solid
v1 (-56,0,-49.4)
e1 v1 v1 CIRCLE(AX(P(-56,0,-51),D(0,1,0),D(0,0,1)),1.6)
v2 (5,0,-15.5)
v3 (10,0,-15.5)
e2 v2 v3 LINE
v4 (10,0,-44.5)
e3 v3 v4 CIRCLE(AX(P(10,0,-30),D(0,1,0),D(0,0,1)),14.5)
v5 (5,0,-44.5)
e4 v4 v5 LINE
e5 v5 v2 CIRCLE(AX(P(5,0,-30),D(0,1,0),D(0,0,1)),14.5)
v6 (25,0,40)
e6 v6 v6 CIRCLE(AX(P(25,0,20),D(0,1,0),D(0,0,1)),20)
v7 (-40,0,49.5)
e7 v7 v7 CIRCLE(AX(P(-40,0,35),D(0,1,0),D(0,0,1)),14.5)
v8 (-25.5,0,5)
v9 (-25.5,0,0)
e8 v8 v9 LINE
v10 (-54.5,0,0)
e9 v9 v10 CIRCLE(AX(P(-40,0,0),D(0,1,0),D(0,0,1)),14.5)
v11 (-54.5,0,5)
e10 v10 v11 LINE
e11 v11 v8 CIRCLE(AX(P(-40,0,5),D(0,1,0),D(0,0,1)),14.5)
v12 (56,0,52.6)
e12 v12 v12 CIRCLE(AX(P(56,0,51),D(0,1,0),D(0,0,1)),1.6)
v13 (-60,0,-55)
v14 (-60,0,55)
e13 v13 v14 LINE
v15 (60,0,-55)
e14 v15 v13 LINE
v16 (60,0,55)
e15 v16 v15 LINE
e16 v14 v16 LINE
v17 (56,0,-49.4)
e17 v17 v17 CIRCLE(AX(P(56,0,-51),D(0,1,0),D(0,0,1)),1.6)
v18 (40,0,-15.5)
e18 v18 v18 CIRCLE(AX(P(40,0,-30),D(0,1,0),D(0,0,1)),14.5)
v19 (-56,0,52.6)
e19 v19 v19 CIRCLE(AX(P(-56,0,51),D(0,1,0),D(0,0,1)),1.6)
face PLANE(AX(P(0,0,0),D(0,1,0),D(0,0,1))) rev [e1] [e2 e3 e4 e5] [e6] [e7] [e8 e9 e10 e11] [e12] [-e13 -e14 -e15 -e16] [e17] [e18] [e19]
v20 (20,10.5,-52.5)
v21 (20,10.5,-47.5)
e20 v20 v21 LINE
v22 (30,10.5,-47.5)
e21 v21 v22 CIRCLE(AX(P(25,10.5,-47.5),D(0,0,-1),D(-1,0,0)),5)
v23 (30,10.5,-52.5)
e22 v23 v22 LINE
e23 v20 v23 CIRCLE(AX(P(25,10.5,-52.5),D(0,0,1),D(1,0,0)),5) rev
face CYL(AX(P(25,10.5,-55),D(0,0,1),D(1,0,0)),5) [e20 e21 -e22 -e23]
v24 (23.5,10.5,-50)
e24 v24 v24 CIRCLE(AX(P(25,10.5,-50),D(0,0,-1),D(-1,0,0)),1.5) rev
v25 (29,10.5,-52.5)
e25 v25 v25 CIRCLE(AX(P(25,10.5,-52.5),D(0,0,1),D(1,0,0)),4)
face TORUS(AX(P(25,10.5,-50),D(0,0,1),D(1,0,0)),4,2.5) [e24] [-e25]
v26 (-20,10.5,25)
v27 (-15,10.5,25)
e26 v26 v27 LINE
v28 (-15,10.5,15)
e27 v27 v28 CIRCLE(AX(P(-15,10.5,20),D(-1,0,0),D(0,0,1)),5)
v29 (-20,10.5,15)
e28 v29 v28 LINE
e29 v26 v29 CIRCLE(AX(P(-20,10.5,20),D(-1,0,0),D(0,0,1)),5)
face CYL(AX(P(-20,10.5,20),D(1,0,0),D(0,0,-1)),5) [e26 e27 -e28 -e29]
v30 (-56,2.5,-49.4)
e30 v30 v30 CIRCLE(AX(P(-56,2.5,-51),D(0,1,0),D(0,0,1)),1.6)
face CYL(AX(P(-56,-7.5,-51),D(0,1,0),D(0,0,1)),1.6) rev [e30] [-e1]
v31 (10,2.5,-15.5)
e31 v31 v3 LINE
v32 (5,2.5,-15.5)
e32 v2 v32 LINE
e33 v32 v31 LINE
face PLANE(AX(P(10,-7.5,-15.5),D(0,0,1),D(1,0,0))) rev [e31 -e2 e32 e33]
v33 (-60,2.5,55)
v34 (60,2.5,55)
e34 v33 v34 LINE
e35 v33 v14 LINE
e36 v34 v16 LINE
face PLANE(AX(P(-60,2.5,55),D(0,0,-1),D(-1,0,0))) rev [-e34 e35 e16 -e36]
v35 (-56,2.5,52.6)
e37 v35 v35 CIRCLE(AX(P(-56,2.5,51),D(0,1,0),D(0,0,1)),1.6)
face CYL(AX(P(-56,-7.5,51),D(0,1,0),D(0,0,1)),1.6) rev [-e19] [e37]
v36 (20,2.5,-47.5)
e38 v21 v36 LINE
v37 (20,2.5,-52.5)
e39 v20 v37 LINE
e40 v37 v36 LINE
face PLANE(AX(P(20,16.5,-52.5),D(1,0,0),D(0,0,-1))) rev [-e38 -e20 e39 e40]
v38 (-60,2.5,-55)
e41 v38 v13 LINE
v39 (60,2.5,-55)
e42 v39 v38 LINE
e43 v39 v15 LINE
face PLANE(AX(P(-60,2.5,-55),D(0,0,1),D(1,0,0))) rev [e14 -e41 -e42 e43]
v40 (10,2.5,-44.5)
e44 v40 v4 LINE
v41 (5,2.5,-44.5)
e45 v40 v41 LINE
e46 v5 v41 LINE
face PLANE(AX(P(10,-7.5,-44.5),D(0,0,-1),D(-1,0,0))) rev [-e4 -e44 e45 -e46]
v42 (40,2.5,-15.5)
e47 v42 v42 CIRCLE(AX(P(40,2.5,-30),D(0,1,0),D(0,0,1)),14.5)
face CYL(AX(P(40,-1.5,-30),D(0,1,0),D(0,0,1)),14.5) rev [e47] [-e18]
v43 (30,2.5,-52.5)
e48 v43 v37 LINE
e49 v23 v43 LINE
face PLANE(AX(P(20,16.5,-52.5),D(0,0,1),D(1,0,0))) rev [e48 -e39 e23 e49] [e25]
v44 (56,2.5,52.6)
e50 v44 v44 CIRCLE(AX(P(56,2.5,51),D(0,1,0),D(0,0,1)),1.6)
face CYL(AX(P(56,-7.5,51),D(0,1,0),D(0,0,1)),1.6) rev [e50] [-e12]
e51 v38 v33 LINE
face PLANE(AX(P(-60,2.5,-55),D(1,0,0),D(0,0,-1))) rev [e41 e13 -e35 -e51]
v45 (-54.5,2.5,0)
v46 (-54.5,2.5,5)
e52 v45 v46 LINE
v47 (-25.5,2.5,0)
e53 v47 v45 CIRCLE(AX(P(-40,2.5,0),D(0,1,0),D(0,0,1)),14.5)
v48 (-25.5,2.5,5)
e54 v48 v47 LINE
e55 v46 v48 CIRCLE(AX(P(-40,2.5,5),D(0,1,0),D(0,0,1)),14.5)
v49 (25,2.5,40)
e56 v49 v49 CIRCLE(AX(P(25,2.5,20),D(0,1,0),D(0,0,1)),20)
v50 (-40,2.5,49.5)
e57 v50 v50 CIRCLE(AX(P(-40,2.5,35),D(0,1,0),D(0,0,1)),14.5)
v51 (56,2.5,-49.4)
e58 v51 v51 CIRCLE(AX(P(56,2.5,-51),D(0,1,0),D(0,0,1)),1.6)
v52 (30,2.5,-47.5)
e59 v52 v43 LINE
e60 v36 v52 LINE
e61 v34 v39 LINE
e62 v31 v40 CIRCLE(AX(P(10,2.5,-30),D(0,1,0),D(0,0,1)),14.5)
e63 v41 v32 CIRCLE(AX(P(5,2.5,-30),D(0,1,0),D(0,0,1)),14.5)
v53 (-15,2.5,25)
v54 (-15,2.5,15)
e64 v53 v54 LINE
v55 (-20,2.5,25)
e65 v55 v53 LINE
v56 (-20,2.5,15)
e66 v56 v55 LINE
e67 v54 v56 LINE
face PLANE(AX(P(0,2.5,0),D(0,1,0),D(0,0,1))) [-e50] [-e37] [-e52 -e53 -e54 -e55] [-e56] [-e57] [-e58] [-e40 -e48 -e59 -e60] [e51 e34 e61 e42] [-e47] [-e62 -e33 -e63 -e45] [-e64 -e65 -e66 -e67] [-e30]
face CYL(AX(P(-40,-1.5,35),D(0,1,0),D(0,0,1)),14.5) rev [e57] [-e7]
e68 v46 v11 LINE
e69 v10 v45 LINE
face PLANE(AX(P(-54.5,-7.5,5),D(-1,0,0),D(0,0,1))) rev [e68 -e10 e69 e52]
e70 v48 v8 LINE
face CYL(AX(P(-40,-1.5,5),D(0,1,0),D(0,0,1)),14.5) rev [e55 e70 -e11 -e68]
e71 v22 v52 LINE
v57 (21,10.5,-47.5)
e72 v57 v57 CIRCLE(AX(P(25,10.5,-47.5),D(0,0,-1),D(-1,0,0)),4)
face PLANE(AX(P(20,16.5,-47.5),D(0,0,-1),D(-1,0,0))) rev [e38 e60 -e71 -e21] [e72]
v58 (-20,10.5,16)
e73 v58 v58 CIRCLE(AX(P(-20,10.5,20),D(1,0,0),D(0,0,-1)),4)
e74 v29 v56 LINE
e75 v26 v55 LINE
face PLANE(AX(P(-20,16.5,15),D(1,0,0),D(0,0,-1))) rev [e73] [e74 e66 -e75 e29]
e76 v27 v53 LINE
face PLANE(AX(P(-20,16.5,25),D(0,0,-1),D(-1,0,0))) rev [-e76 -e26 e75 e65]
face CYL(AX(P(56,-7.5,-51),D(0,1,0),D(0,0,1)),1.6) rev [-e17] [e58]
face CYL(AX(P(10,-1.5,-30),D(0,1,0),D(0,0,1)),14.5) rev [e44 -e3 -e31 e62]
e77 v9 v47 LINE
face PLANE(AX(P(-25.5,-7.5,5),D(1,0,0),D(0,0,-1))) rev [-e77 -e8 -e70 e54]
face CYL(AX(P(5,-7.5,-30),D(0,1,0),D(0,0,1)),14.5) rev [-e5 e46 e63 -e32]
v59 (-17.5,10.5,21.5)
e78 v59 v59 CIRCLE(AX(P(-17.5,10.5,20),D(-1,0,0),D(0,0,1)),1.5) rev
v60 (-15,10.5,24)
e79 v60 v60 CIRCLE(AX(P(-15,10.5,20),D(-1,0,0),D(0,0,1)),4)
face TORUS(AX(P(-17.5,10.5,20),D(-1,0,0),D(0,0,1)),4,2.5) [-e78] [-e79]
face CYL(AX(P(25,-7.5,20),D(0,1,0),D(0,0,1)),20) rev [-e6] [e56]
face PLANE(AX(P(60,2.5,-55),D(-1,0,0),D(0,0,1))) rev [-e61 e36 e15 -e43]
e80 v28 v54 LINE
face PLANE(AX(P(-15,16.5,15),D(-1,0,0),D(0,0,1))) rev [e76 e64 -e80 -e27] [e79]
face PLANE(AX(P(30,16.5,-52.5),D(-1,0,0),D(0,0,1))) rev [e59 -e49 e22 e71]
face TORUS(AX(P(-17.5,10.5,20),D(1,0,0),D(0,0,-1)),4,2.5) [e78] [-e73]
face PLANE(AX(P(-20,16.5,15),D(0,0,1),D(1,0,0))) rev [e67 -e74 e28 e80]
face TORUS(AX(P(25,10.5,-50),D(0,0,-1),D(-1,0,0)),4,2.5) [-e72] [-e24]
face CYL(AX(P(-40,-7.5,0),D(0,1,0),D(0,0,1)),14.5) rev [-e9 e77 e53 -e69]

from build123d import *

# Parameters (mm, degrees)
SKETCH1_W           = 120
SKETCH1_H           = 110
BOSS_EXTRUDE1_DEPTH = 2.5
SKETCH2_R           = 14.5
CUT_EXTRUDE1_DEPTH  = 4
SKETCH3_R           = 20
CUT_EXTRUDE2_DEPTH  = 10
SKETCH5_R           = 1.6
CUT_EXTRUDE5_DEPTH  = 10
CUT_EXTRUDE6_DEPTH  = 10
SKETCH8_W           = 5
SKETCH8_H           = 10
SKETCH8_W_2         = 10
SKETCH8_H_2         = 5
BOSS_EXTRUDE2_DEPTH = 14
SKETCH9_R           = 1.5
CUT_EXTRUDE7_DEPTH  = 120.910383203
SKETCH10_R          = 1.5
CUT_EXTRUDE8_DEPTH  = 5
FILLET1_R           = 2.5


with BuildPart() as part:
    # Sketch1 → Boss-Extrude1 (new body)
    with BuildSketch(Plane(origin=(0, 0, 0), x_dir=(1, 0, 0), z_dir=(0, 1, 0))):
        Rectangle(SKETCH1_W, SKETCH1_H)
    extrude(amount=BOSS_EXTRUDE1_DEPTH)

    # Sketch2 → Cut-Extrude1 (cut)
    with BuildSketch(Plane(origin=(0, 2.5, 0), x_dir=(1, 0, 0), z_dir=(0, 1, 0))):
        with Locations(Location((40, 30, 0), (0, 0, 270))):
            Circle(SKETCH2_R)
        with Locations(Location((10, 30, 0), (0, 0, 270))):
            Circle(SKETCH2_R)
        with Locations(Location((-40, -5, 0), (0, 0, 270))):
            Circle(SKETCH2_R)
        with Locations(Location((-40, -35, 0), (0, 0, 270))):
            Circle(SKETCH2_R)
    extrude(amount=-CUT_EXTRUDE1_DEPTH, mode=Mode.SUBTRACT)

    # Sketch3 → Cut-Extrude2 (cut)
    with BuildSketch(Plane(origin=(0, 2.5, 0), x_dir=(1, 0, 0), z_dir=(0, 1, 0))):
        with Locations(Location((25, -20, 0), (0, 0, 270))):
            Circle(SKETCH3_R)
    extrude(amount=-CUT_EXTRUDE2_DEPTH, mode=Mode.SUBTRACT)

    # Sketch5 → Cut-Extrude5 (cut)
    with BuildSketch(Plane(origin=(0, 2.5, 0), x_dir=(1, 0, 0), z_dir=(0, 1, 0))):
        with Locations(Location((-56, 51, 0), (0, 0, 270))):
            Circle(SKETCH5_R)
        with Locations(Location((56, 51, 0), (0, 0, 270))):
            Circle(SKETCH5_R)
        with Locations(Location((56, -51, 0), (0, 0, 270))):
            Circle(SKETCH5_R)
        with Locations(Location((-56, -51, 0), (0, 0, 270))):
            Circle(SKETCH5_R)
    extrude(amount=-CUT_EXTRUDE5_DEPTH, mode=Mode.SUBTRACT)

    # Sketch7 → Cut-Extrude6 (cut)
    with BuildSketch(Plane(origin=(0, 2.5, 0), x_dir=(1, 0, 0), z_dir=(0, 1, 0))):
        with BuildLine():
            Line((-54.5, -5), (-54.5, 0))
            ThreePointArc((-54.5, 0), (-40, 14.5), (-25.5, 0))
            Line((-25.5, 0), (-25.5, -5))
            ThreePointArc((-25.5, -5), (-40, -19.5), (-54.5, -5))
        make_face()
        with BuildLine():
            Line((10, 15.5), (5, 15.5))
            ThreePointArc((5, 15.5), (-9.5, 30), (5, 44.5))
            Line((5, 44.5), (10, 44.5))
            ThreePointArc((10, 44.5), (24.5, 30), (10, 15.5))
        make_face()
    extrude(amount=-CUT_EXTRUDE6_DEPTH, mode=Mode.SUBTRACT)

    # Sketch8 → Boss-Extrude2 (add)
    with BuildSketch(Plane(origin=(0, 2.5, 0), x_dir=(1, 0, 0), z_dir=(0, 1, 0))):
        with Locations((-17.5, -20)):
            Rectangle(SKETCH8_W, SKETCH8_H)
        with Locations((25, 50)):
            Rectangle(SKETCH8_W_2, SKETCH8_H_2)
    extrude(amount=BOSS_EXTRUDE2_DEPTH)

    # Sketch9 → Cut-Extrude7 (cut, through all)
    with BuildSketch(Plane.XY.offset(-47.5)):
        with Locations((25, 10.5)):
            Circle(SKETCH9_R)
        with BuildLine():
            Line((20, 10.5), (20, 22.099022081))
            Line((20, 22.099022081), (30, 22.099022081))
            Line((30, 22.099022081), (30, 10.5))
            ThreePointArc((30, 10.5), (25, 15.5), (20, 10.5))
        make_face()
    extrude(amount=-CUT_EXTRUDE7_DEPTH, mode=Mode.SUBTRACT)

    # Sketch10 → Cut-Extrude8 (cut)
    with BuildSketch(Plane(origin=(-15, 0, 0), x_dir=(0, 0, -1), z_dir=(1, 0, 0))):
        with Locations((-20, 10.5)):
            Circle(SKETCH10_R)
        with BuildLine():
            Line((-25, 10.5), (-25, 23.531098802))
            Line((-25, 23.531098802), (-15, 23.531098802))
            Line((-15, 23.531098802), (-15, 10.5))
            ThreePointArc((-15, 10.5), (-20, 15.5), (-25, 10.5))
        make_face()
    extrude(amount=-CUT_EXTRUDE8_DEPTH, mode=Mode.SUBTRACT)

    # Fillet1
    fillet1_edges = [part.edges().sort_by_distance(p)[0] for p in [
        (23.5, 10.5, -52.5),
        (23.5, 10.5, -47.5),
        (-20, 10.5, 21.5),
        (-15, 10.5, 21.5),
    ]]
    fillet(fillet1_edges, radius=FILLET1_R - 0.0001)  # a hair under: the kernel refuses the full size


solid = part.part
